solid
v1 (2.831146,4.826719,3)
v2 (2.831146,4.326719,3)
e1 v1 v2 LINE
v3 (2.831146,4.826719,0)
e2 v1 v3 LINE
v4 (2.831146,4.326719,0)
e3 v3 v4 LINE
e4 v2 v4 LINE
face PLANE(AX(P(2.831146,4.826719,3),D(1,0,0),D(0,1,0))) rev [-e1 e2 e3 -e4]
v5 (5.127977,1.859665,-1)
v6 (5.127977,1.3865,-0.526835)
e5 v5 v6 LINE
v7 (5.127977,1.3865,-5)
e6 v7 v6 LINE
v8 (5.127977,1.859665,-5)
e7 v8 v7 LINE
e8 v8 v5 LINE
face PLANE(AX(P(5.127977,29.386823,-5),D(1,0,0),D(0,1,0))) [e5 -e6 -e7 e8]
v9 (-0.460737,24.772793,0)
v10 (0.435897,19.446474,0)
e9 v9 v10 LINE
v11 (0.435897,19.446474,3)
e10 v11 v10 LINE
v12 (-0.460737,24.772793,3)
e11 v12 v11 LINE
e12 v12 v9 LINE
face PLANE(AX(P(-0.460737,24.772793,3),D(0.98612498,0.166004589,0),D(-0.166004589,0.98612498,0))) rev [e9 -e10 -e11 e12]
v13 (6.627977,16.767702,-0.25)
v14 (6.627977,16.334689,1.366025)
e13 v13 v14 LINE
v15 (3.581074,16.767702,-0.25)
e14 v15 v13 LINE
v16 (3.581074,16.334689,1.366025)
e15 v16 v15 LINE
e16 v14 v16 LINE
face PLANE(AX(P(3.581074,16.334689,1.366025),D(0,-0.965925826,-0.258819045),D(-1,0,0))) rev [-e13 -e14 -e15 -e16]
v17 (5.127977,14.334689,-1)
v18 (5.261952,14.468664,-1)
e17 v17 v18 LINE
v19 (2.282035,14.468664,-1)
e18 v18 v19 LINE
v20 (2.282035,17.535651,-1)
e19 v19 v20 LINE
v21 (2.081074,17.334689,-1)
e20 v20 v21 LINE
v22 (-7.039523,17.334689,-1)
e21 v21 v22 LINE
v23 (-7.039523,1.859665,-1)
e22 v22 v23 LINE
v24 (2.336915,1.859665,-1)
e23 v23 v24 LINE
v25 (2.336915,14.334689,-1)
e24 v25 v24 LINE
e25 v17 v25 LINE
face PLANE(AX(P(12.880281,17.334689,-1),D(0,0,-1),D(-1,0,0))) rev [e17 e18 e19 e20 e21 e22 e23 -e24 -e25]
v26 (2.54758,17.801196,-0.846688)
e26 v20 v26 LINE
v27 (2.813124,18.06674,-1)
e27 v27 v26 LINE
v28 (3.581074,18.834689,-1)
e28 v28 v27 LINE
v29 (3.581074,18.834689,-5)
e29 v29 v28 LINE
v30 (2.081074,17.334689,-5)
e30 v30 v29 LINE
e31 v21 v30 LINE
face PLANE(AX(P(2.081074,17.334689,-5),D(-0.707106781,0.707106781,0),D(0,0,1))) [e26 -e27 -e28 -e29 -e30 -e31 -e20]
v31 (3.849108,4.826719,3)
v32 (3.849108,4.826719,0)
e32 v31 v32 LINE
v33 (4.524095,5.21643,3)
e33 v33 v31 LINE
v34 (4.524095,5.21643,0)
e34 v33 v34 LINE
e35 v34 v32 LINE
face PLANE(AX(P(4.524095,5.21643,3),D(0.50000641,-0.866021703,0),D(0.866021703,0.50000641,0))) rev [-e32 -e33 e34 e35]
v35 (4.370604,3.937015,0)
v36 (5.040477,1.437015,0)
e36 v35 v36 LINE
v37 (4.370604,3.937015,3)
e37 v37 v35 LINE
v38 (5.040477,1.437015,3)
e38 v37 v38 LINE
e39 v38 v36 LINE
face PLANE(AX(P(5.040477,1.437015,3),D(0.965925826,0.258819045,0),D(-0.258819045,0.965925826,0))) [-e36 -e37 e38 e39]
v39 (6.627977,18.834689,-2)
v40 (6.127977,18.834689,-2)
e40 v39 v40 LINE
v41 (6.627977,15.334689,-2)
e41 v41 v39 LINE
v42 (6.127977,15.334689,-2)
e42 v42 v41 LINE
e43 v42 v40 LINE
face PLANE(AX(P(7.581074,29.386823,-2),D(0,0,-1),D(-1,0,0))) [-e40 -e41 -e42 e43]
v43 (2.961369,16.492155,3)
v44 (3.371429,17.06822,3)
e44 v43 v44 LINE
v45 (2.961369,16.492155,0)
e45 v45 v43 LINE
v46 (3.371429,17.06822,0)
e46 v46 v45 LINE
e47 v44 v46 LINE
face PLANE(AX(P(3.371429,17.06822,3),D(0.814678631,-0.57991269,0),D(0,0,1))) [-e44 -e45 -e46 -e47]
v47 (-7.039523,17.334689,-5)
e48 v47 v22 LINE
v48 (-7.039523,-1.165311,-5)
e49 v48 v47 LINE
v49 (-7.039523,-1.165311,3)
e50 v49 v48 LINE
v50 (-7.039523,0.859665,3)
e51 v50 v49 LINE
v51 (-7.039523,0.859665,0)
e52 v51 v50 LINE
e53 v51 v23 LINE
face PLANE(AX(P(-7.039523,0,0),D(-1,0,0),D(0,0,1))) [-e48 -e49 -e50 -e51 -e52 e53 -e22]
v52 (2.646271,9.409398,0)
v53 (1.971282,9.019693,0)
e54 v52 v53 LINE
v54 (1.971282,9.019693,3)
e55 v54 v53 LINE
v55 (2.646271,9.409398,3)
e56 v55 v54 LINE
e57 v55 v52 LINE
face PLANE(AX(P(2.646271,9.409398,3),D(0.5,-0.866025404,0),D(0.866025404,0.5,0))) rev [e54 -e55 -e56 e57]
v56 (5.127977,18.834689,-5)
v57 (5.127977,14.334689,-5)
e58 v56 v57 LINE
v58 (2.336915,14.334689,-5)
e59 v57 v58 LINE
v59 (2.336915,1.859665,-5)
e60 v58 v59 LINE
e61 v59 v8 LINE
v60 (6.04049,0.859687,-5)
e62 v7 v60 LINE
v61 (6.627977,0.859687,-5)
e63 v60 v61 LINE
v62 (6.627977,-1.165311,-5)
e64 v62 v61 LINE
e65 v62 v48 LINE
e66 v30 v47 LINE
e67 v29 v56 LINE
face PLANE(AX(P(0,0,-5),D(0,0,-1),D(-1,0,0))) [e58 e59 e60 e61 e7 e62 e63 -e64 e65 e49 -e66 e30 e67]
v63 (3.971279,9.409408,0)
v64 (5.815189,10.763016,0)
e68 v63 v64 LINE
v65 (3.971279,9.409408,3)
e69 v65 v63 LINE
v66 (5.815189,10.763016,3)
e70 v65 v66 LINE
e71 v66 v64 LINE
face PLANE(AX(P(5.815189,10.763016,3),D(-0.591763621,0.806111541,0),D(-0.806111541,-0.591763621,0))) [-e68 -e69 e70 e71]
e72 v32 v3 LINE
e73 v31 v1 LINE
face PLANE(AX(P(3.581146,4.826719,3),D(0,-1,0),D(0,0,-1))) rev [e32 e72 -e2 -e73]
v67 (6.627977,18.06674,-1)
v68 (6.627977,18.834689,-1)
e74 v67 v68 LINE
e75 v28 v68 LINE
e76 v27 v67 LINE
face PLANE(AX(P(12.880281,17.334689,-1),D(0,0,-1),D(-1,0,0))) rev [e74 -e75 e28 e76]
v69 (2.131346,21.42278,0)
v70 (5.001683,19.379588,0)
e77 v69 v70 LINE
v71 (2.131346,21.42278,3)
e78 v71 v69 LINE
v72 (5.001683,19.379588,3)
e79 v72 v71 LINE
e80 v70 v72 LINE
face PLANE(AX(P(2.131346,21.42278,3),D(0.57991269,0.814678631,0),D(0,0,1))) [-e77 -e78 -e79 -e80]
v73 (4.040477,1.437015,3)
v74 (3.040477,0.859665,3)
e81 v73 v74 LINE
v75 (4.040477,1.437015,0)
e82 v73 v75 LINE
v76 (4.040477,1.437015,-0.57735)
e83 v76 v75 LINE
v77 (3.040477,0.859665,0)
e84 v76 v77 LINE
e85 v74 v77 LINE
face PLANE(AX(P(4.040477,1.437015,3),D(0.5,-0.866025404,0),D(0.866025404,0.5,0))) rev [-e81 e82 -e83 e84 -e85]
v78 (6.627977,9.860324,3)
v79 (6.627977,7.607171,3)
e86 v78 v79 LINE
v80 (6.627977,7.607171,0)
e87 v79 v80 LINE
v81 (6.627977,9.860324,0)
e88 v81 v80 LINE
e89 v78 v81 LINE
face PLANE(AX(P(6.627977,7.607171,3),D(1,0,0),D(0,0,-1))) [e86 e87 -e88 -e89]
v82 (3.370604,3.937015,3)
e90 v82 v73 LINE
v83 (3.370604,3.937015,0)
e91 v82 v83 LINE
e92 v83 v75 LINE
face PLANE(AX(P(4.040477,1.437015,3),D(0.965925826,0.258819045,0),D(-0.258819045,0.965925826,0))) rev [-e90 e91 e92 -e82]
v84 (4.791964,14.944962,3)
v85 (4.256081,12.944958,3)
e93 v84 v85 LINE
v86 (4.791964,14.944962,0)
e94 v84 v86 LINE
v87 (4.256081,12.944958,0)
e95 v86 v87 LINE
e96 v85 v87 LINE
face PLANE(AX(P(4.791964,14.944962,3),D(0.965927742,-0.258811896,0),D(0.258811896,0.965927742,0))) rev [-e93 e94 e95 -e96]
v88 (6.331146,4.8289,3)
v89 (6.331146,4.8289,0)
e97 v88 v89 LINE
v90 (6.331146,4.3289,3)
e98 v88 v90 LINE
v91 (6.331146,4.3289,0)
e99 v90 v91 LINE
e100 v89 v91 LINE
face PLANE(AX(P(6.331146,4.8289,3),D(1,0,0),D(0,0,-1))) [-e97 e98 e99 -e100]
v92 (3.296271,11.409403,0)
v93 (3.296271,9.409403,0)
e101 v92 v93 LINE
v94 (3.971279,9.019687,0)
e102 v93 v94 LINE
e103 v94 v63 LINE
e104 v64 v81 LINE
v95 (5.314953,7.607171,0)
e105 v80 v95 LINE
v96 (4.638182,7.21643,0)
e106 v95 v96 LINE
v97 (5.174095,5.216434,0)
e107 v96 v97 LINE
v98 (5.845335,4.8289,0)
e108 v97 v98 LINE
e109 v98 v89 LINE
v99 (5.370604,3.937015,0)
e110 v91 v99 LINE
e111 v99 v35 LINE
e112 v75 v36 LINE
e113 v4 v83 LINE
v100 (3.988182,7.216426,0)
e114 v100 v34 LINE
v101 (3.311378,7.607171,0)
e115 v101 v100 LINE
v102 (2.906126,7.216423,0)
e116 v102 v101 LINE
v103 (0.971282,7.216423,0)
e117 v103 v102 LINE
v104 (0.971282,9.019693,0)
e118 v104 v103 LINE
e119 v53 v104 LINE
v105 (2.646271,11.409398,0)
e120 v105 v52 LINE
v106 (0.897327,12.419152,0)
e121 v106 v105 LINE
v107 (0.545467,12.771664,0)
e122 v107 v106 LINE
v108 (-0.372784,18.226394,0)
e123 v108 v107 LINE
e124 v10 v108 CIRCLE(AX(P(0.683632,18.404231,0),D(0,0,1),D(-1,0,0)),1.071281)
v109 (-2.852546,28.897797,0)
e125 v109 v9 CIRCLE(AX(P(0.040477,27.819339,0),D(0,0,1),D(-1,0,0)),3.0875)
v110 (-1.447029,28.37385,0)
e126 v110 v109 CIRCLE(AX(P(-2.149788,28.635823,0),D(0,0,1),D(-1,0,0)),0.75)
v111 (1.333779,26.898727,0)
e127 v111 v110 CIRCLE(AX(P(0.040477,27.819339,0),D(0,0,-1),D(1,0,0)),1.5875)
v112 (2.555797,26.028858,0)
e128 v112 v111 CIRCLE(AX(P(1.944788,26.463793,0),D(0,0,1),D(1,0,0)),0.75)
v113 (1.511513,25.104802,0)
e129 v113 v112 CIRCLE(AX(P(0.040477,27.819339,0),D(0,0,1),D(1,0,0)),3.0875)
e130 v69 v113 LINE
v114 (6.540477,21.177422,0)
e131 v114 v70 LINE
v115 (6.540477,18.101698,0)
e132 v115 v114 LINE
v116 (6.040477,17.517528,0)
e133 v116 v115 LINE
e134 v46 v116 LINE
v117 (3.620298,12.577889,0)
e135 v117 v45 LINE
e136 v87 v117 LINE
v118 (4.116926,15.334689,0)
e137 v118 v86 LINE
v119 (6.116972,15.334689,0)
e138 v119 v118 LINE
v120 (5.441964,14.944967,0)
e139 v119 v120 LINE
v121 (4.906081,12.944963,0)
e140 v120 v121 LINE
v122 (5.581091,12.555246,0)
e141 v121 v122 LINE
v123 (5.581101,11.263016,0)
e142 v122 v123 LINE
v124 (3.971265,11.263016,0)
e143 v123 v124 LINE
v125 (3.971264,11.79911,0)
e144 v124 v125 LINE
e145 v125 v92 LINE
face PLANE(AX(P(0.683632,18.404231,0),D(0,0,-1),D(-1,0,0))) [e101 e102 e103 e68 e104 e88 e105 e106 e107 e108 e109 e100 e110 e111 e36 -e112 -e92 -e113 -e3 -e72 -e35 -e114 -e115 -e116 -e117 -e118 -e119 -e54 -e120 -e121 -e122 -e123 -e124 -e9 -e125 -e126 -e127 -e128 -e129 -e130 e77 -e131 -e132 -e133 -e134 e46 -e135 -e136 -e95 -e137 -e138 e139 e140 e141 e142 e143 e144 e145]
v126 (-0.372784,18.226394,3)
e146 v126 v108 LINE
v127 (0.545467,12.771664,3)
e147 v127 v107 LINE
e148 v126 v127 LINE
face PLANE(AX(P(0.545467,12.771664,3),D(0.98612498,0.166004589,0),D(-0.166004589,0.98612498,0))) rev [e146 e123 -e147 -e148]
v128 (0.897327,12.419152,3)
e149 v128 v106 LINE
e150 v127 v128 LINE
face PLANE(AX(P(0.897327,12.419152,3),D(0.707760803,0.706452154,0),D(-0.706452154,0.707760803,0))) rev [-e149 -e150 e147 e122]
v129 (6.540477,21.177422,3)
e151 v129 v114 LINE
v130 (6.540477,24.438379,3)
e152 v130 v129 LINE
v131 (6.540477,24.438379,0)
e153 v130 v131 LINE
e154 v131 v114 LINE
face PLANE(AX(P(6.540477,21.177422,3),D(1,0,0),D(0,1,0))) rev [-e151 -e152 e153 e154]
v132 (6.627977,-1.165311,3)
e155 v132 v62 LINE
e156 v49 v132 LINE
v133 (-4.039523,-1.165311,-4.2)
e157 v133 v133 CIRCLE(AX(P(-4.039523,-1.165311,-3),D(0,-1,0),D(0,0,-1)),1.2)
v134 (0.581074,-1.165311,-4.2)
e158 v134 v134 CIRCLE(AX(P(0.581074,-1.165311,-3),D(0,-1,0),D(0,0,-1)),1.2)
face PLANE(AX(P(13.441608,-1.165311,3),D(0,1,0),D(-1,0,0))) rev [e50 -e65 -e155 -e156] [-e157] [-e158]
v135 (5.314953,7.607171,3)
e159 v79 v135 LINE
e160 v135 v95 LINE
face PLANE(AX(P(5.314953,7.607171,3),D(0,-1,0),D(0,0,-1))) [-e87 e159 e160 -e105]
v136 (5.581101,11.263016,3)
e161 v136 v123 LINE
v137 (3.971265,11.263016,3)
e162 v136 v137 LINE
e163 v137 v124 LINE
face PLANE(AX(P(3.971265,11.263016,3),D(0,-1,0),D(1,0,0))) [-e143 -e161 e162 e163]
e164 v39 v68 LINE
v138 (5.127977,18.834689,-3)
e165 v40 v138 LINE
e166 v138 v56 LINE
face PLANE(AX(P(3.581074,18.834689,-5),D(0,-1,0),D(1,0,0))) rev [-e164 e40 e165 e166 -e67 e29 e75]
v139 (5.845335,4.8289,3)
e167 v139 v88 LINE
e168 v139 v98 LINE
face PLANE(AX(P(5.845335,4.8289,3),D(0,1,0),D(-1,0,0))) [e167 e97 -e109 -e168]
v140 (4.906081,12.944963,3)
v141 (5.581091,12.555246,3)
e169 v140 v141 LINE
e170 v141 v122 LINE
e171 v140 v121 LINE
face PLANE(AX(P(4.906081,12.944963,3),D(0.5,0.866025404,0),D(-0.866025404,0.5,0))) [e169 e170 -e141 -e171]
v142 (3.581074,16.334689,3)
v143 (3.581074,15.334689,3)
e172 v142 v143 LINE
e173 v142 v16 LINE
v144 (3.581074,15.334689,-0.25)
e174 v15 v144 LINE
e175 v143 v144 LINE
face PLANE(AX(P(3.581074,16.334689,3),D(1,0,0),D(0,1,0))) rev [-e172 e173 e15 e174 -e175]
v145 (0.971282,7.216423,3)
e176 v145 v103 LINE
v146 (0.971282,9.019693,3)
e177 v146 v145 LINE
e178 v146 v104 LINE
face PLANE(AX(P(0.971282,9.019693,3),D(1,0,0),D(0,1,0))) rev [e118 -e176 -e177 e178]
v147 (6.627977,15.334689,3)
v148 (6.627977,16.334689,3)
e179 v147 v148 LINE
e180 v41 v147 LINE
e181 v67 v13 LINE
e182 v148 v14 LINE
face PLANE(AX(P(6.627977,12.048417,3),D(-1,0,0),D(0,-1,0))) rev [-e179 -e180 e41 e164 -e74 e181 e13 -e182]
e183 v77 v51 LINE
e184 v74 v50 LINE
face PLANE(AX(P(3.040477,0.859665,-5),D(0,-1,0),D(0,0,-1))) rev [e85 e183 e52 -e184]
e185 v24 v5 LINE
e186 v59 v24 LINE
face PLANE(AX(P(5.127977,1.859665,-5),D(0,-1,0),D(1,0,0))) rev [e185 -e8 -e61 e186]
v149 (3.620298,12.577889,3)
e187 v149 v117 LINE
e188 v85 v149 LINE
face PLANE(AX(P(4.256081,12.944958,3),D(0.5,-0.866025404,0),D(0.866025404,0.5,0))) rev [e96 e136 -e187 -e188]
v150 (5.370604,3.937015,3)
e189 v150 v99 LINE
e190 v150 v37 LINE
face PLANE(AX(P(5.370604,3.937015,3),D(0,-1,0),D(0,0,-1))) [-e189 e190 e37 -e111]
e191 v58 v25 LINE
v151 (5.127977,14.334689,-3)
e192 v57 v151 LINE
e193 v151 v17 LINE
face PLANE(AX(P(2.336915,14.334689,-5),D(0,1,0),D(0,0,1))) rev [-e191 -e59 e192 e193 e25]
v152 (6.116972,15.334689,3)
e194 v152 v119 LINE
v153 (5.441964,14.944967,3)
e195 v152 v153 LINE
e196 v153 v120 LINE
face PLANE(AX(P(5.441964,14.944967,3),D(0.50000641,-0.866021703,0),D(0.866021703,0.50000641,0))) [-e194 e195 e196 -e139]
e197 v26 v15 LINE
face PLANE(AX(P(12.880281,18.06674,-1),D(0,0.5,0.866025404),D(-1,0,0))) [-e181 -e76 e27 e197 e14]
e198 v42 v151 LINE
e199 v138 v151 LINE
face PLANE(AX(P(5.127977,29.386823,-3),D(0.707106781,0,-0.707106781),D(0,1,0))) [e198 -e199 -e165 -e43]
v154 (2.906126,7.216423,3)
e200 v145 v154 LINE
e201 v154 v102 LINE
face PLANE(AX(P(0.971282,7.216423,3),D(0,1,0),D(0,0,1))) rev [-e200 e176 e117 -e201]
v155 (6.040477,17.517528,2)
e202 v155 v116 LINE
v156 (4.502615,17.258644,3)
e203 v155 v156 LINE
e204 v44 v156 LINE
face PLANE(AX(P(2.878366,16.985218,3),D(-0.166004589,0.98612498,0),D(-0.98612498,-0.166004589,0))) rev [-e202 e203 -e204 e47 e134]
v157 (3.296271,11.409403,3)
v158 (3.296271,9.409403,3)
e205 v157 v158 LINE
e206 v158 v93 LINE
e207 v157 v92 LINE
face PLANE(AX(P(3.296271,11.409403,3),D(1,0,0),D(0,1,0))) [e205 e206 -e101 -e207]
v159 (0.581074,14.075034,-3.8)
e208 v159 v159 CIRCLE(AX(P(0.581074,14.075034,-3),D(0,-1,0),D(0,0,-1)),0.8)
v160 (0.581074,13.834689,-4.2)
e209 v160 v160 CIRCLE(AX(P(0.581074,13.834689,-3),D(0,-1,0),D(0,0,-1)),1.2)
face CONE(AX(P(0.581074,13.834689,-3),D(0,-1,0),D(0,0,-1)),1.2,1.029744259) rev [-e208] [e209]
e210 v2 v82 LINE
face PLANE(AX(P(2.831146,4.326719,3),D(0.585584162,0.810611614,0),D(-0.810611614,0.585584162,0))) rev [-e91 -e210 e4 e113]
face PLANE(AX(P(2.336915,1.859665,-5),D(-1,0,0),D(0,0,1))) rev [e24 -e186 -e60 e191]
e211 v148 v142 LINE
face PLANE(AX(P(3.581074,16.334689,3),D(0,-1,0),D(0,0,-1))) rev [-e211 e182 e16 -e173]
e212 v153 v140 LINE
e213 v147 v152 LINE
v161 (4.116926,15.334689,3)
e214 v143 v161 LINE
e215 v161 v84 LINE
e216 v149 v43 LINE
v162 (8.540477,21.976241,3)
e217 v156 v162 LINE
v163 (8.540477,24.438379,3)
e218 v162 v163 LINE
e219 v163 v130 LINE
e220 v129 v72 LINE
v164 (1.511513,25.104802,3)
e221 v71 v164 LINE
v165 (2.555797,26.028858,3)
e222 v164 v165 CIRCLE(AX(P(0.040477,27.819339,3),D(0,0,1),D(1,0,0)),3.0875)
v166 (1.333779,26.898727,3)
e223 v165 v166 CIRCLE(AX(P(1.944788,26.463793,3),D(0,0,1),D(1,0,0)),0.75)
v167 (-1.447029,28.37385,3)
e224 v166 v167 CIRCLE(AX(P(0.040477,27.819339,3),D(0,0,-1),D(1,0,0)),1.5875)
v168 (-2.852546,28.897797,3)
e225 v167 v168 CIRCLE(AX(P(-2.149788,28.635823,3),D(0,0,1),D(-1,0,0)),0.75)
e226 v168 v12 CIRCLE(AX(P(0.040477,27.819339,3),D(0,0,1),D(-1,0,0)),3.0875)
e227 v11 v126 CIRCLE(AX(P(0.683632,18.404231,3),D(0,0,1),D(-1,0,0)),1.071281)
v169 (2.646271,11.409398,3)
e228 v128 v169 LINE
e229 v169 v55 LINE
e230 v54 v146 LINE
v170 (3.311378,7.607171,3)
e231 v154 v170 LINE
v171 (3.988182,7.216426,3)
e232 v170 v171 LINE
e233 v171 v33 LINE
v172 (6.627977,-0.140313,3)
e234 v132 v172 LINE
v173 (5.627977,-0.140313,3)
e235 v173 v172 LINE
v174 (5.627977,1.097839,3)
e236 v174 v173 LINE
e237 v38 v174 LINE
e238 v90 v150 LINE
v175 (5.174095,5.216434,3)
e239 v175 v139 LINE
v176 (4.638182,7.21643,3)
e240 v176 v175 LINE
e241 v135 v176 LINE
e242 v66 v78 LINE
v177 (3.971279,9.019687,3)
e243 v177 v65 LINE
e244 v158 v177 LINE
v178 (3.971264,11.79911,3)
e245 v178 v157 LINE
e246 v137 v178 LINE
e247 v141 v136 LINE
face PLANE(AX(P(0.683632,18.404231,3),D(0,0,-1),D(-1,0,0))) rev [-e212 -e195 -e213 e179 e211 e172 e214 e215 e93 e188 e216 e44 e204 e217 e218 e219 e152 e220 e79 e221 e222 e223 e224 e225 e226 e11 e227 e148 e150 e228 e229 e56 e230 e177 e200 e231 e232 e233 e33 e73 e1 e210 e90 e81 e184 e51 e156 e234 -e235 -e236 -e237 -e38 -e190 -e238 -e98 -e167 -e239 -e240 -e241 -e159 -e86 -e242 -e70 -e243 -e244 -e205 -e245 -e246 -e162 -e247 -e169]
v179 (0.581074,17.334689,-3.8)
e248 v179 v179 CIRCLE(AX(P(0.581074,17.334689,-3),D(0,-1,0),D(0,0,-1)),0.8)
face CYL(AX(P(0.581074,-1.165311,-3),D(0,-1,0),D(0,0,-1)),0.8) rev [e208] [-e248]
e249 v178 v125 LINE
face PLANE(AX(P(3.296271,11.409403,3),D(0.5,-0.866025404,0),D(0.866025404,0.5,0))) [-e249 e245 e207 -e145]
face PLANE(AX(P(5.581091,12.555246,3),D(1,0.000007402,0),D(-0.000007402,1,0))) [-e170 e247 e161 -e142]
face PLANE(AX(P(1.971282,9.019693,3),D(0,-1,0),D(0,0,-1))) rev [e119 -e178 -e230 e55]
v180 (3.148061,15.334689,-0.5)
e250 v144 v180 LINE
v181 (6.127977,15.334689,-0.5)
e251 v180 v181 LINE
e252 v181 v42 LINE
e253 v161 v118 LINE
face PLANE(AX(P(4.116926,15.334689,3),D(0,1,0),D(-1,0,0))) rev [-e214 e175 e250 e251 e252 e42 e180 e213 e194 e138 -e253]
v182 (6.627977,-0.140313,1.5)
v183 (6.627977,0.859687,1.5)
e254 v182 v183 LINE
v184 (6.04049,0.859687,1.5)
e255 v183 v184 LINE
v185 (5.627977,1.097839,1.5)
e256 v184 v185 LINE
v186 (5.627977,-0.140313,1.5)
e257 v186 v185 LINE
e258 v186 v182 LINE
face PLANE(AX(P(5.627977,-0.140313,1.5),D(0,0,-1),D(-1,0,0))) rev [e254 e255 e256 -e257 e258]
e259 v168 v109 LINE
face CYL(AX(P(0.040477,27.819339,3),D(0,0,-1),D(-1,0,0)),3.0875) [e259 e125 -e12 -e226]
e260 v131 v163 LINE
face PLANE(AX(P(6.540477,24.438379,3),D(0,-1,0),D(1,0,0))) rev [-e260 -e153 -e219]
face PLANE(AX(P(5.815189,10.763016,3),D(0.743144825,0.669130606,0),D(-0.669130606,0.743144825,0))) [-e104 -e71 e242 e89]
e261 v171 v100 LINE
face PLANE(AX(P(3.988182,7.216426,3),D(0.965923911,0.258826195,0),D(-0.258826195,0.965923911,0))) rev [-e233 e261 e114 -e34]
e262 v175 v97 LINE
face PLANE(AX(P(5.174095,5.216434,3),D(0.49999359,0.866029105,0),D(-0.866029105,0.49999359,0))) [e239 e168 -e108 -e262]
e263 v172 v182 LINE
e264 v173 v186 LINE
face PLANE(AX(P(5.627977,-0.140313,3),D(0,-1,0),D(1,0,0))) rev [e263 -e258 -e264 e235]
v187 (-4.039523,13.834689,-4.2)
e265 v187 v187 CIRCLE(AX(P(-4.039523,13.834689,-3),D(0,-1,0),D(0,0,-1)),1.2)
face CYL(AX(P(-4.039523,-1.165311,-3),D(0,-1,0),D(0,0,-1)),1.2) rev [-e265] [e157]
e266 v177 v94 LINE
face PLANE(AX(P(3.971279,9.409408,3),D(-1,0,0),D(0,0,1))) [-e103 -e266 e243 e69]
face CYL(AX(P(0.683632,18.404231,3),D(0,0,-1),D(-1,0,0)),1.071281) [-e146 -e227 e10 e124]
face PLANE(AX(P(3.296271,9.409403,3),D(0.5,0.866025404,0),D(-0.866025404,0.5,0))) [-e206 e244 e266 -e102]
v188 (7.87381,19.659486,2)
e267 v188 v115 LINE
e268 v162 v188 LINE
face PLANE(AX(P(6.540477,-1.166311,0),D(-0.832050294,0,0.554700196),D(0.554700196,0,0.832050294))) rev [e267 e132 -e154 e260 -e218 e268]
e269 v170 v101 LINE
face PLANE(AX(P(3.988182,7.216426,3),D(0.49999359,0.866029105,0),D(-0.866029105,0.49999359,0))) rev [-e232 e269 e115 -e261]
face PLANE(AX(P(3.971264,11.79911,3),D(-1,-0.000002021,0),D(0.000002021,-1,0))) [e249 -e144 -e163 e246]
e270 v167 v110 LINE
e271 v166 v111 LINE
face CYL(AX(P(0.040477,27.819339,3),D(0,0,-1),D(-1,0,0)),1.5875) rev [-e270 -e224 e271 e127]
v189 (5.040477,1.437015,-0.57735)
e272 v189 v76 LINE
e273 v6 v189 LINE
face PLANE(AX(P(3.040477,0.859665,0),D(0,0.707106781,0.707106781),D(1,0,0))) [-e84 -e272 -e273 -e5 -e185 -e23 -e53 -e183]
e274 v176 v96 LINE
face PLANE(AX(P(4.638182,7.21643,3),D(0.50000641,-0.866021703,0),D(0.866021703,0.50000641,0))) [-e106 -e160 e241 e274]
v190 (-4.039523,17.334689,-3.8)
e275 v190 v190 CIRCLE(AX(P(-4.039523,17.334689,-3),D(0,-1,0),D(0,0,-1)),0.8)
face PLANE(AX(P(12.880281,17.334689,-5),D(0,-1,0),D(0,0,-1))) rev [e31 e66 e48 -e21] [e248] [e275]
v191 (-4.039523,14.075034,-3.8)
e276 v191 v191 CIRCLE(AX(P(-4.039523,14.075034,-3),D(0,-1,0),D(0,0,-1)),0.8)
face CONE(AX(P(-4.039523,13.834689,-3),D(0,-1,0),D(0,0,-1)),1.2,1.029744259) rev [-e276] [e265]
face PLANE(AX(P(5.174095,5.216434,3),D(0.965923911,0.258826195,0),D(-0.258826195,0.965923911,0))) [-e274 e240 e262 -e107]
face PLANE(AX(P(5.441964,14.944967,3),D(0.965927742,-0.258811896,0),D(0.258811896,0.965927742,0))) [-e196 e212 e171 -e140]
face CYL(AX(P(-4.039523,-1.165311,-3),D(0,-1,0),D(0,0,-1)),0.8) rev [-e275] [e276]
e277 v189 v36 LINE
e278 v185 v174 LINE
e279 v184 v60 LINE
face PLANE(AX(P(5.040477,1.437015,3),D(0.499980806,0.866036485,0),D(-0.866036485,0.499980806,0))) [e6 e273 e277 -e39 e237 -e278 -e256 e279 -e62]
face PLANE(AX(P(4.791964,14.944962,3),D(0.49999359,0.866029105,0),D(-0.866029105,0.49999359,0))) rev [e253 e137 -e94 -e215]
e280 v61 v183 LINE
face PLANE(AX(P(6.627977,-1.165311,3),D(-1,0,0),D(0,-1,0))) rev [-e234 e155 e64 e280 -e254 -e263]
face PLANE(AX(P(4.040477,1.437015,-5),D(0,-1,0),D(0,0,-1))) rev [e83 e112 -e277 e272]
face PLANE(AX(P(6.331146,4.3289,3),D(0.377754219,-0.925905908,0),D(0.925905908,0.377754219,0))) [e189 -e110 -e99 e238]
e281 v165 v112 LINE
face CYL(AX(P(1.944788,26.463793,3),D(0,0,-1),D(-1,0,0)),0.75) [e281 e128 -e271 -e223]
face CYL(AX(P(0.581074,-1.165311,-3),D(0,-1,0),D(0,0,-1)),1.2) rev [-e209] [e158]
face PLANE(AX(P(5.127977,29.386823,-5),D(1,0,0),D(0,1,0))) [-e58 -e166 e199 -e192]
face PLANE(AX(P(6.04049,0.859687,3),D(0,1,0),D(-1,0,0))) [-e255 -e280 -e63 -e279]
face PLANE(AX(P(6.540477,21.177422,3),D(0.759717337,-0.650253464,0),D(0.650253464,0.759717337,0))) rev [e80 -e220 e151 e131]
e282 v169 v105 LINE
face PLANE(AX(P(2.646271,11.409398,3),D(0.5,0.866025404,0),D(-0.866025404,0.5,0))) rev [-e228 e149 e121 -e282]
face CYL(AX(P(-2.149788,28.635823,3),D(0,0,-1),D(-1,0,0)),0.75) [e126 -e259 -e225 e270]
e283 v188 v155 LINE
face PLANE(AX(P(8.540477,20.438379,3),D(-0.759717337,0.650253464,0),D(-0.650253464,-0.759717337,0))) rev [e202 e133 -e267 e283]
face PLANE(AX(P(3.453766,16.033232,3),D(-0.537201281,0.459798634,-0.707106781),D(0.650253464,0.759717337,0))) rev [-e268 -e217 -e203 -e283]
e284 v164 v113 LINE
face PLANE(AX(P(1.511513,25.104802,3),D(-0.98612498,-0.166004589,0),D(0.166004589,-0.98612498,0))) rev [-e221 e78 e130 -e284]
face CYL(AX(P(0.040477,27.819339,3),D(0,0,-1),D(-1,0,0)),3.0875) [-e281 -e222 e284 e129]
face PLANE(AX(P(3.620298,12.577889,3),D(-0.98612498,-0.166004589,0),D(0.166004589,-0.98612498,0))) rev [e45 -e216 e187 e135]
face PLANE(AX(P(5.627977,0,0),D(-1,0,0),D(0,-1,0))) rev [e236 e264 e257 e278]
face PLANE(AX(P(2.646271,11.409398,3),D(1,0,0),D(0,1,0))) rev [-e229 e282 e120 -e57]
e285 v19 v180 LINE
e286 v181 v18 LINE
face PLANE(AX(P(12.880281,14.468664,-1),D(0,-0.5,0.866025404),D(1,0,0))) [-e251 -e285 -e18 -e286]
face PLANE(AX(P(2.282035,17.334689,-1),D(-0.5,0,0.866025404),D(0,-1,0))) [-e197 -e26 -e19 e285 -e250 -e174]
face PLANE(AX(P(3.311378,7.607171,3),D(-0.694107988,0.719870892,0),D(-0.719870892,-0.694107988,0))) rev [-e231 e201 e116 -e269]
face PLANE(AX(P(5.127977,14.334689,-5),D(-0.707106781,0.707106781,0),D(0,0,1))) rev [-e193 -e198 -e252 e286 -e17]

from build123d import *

# Parameters (mm, degrees)
BOSS_SWITCH_BODY_DEPTH                         = 3
SKETCH1_W                                      = 4
SKETCH1_H                                      = 3.5
BOSS_FLANGE_WIDTH_DEPTH                        = 5
BOSS_FLANGE_HEIGHT_REACH                       = 38.166
SKETCH2_W                                      = 4
SKETCH2_H                                      = 2
SKETCH2_W_2                                    = 8
SKETCH2_H_2                                    = 2.024975669
CUT_UP_TO_DOWN_DERAILLEUR_CLEARANCE_REACH      = 23.862
SKETCH10_W                                     = 2.453096586
SKETCH10_H                                     = 3
SKETCH17_W                                     = 12.1675
SKETCH17_H                                     = 4
BOSS_FLANGE_SUPPORT_DEPTH                      = 14.475024331
TAP_DRILL_FOR_M2X0_4_TAP1_D                    = 1.6
M2_CLEARANCE_HOLE2_D                           = 2.4
M2_CLEARANCE_HOLE2_DEPTH                       = 15
M2_CLEARANCE_HOLE2_TIP                         = 0.721032743
CUT_UP_TO_DOWN_CANTILEVER_SLOPE_REACH          = 31.347
CUT_DOWN_TO_UP_DERAILLEUR_CLEARANCE_DEPTH      = 33.69867621
CUT_DOWN_TO_UP_DERAILLEUR_CLEARANCE_DEPTH_BACK = 33.69867621
CHAMFER_FLANGE_SUPPORT_SIZE                    = 1.5
CHAMFER_FLANGE_SUPPORT_2_SIZE                  = 1
CHAMFER_FLANGE_SUPPORT_3_SIZE                  = 1
SKETCH18_W                                     = 1.5
SKETCH18_H                                     = 1.577328106
CUT_DOWN_TO_UP_DERAILLEUR_CLEARANCE_2_DEPTH    = 1
SKETCH19_W                                     = 3.046903414
SKETCH19_H                                     = 2.563581512
CUT_UP_TO_DOWN_CANTILEVER_CLEARANCE_DEPTH      = 1
CHAMFER1_SIZE                                  = 1
CHAMFER1_SIZE_2                                = 1.732050808
CHAMFER3_SIZE                                  = 0.75
CHAMFER3_SIZE_2                                = 1.299038106
CHAMFER4_SIZE                                  = 0.5
CHAMFER4_SIZE2                                 = 0.866025404
CHAMFER5_SIZE                                  = 0.5
CHAMFER6_SIZE                                  = 2.5
CHAMFER7_SIZE                                  = 1
CUT_EXTRUDE3_REACH                             = 33.008
CHAMFER8_SIZE                                  = 0.5
CHAMFER8_SIZE2                                 = 1.366025404
SKETCH23_W                                     = 2.791062273
SKETCH23_H                                     = 12.475024331
CUT_EXTRUDE4_DEPTH                             = 31.862053717


# Some blends are built 0.0001 mm under size
with BuildPart() as part:
    # Sketch-SwitchBossUp → Boss-Switch Body (new body)
    with BuildSketch(Plane.XY):
        with BuildLine():
            Line((6.540476927, 21.177422148), (6.540476927, 24.438379064))
            Line((6.540476927, 24.438379064), (8.540476927, 24.438379064))
            Line((8.540476927, 24.438379064), (8.540476927, 20.438379064))
            Line((8.540476927, 20.438379064), (6.040476927, 17.517528279))
            Line((6.040476927, 17.517528279), (2.878366495, 16.985217616))
            Line((2.878366495, 16.985217616), (3.620297651, 12.577888564))
            Line((3.620297651, 12.577888564), (4.256080915, 12.944958203))
            Line((4.256080915, 12.944958203), (4.791964496, 14.944962169))
            Line((4.791964496, 14.944962169), (4.116925685, 15.334689347))
            Line((4.116925685, 15.334689347), (3.581073513, 15.334689347))
            Line((3.581073513, 15.334689347), (3.581073513, 16.334689347))
            Line((3.581073513, 16.334689347), (6.857327822, 16.334689347))
            Line((6.857327822, 16.334689347), (13.441607507, 16.334689347))
            Line((13.441607507, 16.334689347), (13.441607507, -1.165310653))
            Line((13.441607507, -1.165310653), (5.040476927, -1.165310653))
            Line((5.040476927, -1.165310653), (3.040476927, -1.165310653))
            Line((3.040476927, -1.165310653), (3.040476927, 0.859665016))
            Line((3.040476927, 0.859665016), (4.040476927, 1.437015286))
            Line((4.040476927, 1.437015286), (3.370603946, 3.937015286))
            Line((3.370603946, 3.937015286), (2.83114552, 4.326718942))
            Line((2.83114552, 4.326718942), (2.83114552, 4.826718942))
            Line((2.83114552, 4.826718942), (3.58114552, 4.826718942))
            Line((3.58114552, 4.826718942), (3.849107629, 4.826718942))
            Line((3.849107629, 4.826718942), (4.524094713, 5.216429578))
            Line((4.524094713, 5.216429578), (3.988181525, 7.216425611))
            Line((3.988181525, 7.216425611), (3.311378308, 7.607171452))
            Line((3.311378308, 7.607171452), (2.9061262, 7.216422599))
            Line((2.9061262, 7.216422599), (0.971281627, 7.216422599))
            Line((0.971281627, 7.216422599), (0.971281627, 9.019692757))
            Line((0.971281627, 9.019692757), (1.971281627, 9.019692757))
            Line((1.971281627, 9.019692757), (2.646271341, 9.40939825))
            Line((2.646271341, 9.40939825), (2.646271341, 11.40939825))
            Line((2.646271341, 11.40939825), (0.897326855, 12.41915182))
            Line((0.897326855, 12.41915182), (0.545466745, 12.771663724))
            Line((0.545466745, 12.771663724), (-0.372784255, 18.226393961))
            ThreePointArc((-0.372784255, 18.226393961), (-0.209313172, 18.996084896), (0.435897335, 19.446473985))
            Line((0.435897335, 19.446473985), (-0.46073685, 24.772792819))
            ThreePointArc((-0.46073685, 24.772792819), (-2.630501593, 26.270619745), (-2.852546321, 28.897797067))
            ThreePointArc((-2.852546321, 28.897797067), (-1.887813913, 29.338582026), (-1.447028953, 28.373849618))
            ThreePointArc((-1.447028953, 28.373849618), (-0.703448682, 26.416936722), (1.333779254, 26.898727173))
            ThreePointArc((1.333779254, 26.898727173), (2.379722745, 27.074801628), (2.555797201, 26.028858137))
            ThreePointArc((2.555797201, 26.028858137), (2.086504637, 25.507104397), (1.511513111, 25.104801997))
            Line((1.511513111, 25.104801997), (2.546357317, 18.957467576))
            Line((2.546357317, 18.957467576), (4.992893704, 19.36931828))
            Line((4.992893704, 19.36931828), (6.540476927, 21.177422148))
        make_face()
        Polygon((5.581091201, 12.555245643), (5.581100766, 11.263016278), (3.971265023, 11.263016278), (3.97126394, 11.79911022), (3.296271341, 11.409403061), (3.296271341, 9.409403061), (3.971278743, 9.019687356), (3.971278743, 9.409408058), (5.815189335, 10.763016278), (6.627976927, 9.860324206), (6.627976927, 8.365258971), (6.627976927, 7.607171452), (5.314953271, 7.607171452), (4.638181525, 7.216430422), (5.174094713, 5.216434389), (5.845334952, 4.828900281), (6.33114552, 4.828900281), (6.33114552, 4.328900281), (5.370603946, 3.937015286), (4.370603946, 3.937015286), (5.040476927, 1.437015286), (6.040489723, 0.85968718), (9.127976927, 0.85968718), (10.437466736, 2.169176988), (10.437466736, 14.025199539), (9.127976927, 15.334689347), (6.116971898, 15.334689347), (5.441964496, 14.94496698), (4.906080915, 12.944963014), align=None, mode=Mode.SUBTRACT)
    extrude(amount=BOSS_SWITCH_BODY_DEPTH)

    # Sketch1 → Boss-Flange Width (add)
    with BuildSketch(Plane(origin=(0, 0, 0), x_dir=(-1, 0, 0), z_dir=(0, 0, -1))):
        Polygon((-7.581073513, -1.165310653), (0.412170615, -1.165310653), (0.412170615, 0.859665016), (-3.040476927, 0.859665016), (-4.040476927, 1.437015286), (-5.040476927, 1.437015286), (-6.040489723, 0.85968718), (-7.581073513, 0.85968718), align=None)
        with Locations((-5.581073513, 17.084689347)):
            Rectangle(SKETCH1_W, SKETCH1_H)
    extrude(amount=BOSS_FLANGE_WIDTH_DEPTH)

    # Sketch2 → Boss-Flange Height (add, up to next)
    with BuildSketch(Plane(origin=(-7.039523073, 0, 0), x_dir=(0, 0, -1), z_dir=(1, 0, 0)), mode=Mode.PRIVATE) as boss_flange_height_sk1:
        with Locations((3, 16.334689347)):
            Rectangle(SKETCH2_W, SKETCH2_H)
    boss_flange_height_tool1 = extrude(boss_flange_height_sk1.sketch, amount=BOSS_FLANGE_HEIGHT_REACH, mode=Mode.PRIVATE) - part.part
    # Sketch2 → Boss-Flange Height (add, up to next)
    with BuildSketch(Plane(origin=(-7.039523073, 0, 0), x_dir=(0, 0, -1), z_dir=(1, 0, 0)), mode=Mode.PRIVATE) as boss_flange_height_sk2:
        with Locations((1, -0.152822819)):
            Rectangle(SKETCH2_W_2, SKETCH2_H_2)
    boss_flange_height_tool2 = extrude(boss_flange_height_sk2.sketch, amount=BOSS_FLANGE_HEIGHT_REACH, mode=Mode.PRIVATE) - part.part
    add(boss_flange_height_tool1.solids().sort_by_distance((-7.039523, 16.334689, -3))[0])
    add(boss_flange_height_tool2.solids().sort_by_distance((-7.039523, -0.152823, -1))[0])

    # Sketch10 → Cut-Up-To-Down Derailleur Clearance (cut, up to next)
    with BuildSketch(Plane(origin=(0, 15.334689347, 0), x_dir=(1, 0, 0), z_dir=(0, 1, 0)), mode=Mode.PRIVATE) as cut_up_to_down_derailleur_clearance_sk1:
        with Locations((6.35452522, 3.5)):
            Rectangle(SKETCH10_W, SKETCH10_H)
    cut_up_to_down_derailleur_clearance_tool1 = extrude(cut_up_to_down_derailleur_clearance_sk1.sketch, amount=CUT_UP_TO_DOWN_DERAILLEUR_CLEARANCE_REACH, mode=Mode.PRIVATE) & part.part
    add(cut_up_to_down_derailleur_clearance_tool1.solids().sort_by_distance((6.354525, 15.334689, -3.5))[0], mode=Mode.SUBTRACT)

    # Sketch17 → Boss-Flange Support (add)
    with BuildSketch(Plane.XZ.offset(-15.334689347)):
        with Locations((-0.955773073, -3)):
            Rectangle(SKETCH17_W, SKETCH17_H)
    extrude(amount=BOSS_FLANGE_SUPPORT_DEPTH)

    # Tap Drill for M2x0.4 Tap1 (through all)
    with Locations(Plane(origin=(0, -1.165310653, 0), x_dir=(-1, 0, 0), z_dir=(0, -1, 0))):
        with Locations((4.039523073, 3), (-0.581073513, 3)):
            Hole(TAP_DRILL_FOR_M2X0_4_TAP1_D / 2)

    # M2 Clearance Hole2
    with Locations(Plane.XZ.offset(1.165310653)):
        with Locations((-4.039523073, -3), (0.581073513, -3)):
            Hole(M2_CLEARANCE_HOLE2_D / 2, depth=M2_CLEARANCE_HOLE2_DEPTH)
            with Locations((0, 0, -(M2_CLEARANCE_HOLE2_DEPTH + M2_CLEARANCE_HOLE2_TIP / 2))):  # 118° drill point
                Cone(0, M2_CLEARANCE_HOLE2_D / 2, M2_CLEARANCE_HOLE2_TIP, mode=Mode.SUBTRACT)

    # Sketch12 → Cut-Up-to-Down Cantilever Slope (cut, up to next)
    with BuildSketch(Plane(origin=(0, 24.438379064, 0), x_dir=(1, 0, 0), z_dir=(0, 1, 0)), mode=Mode.PRIVATE) as cut_up_to_down_cantilever_slope_sk1:
        Polygon((6.540476927, 0), (8.540476927, -3), (8.540476927, 0), align=None)
    cut_up_to_down_cantilever_slope_tool1 = extrude(cut_up_to_down_cantilever_slope_sk1.sketch, amount=-CUT_UP_TO_DOWN_CANTILEVER_SLOPE_REACH, mode=Mode.PRIVATE) & part.part
    add(cut_up_to_down_cantilever_slope_tool1.solids().sort_by_distance((7.87381, 24.438379, 1))[0], mode=Mode.SUBTRACT)

    # Sketch16 → Cut-Down-to-Up Derailleur Clearance (cut, two sides: drawn at the far end of the back side and taken through both)
    with BuildSketch(Plane(origin=(0, 0, 0), x_dir=(-1, 0, 0), z_dir=(0, 0, -1)).offset(-CUT_DOWN_TO_UP_DERAILLEUR_CLEARANCE_DEPTH_BACK)):
        Polygon((-7.581073513, 18.834689347), (-13.441607507, 18.834689347), (-13.441607507, -1.165310653), (-6.627976927, -1.165310653), (-6.627976927, 5.203794929), (-8.003689255, 5.203794929), (-8.003689255, 12.048417413), (-6.627976927, 12.048417413), (-6.627976927, 17.947659965), align=None)
    extrude(amount=CUT_DOWN_TO_UP_DERAILLEUR_CLEARANCE_DEPTH + CUT_DOWN_TO_UP_DERAILLEUR_CLEARANCE_DEPTH_BACK, mode=Mode.SUBTRACT)

    # Chamfer-Flange Support
    chamfer_flange_support_edges = [part.edges().sort_by_distance(p)[0] for p in [
        (3.581073513, 17.334689347, -3),
    ]]
    chamfer(chamfer_flange_support_edges, length=CHAMFER_FLANGE_SUPPORT_SIZE - 0.0001)  # a hair under: the kernel refuses the full size

    # Chamfer-Flange Support 2
    chamfer_flange_support_2_edges = [part.edges().sort_by_distance(p)[0] for p in [
        (5.127976927, 17.084689347, -2),
        (5.127976927, 15.334689347, -1.5),
    ]]
    chamfer(chamfer_flange_support_2_edges, length=CHAMFER_FLANGE_SUPPORT_2_SIZE)

    # Chamfer-Flange Support 3
    chamfer_flange_support_3_edges = [part.edges().sort_by_distance(p)[0] for p in [
        (-1.999523073, 0.859665016, -1),
    ]]
    chamfer(chamfer_flange_support_3_edges, length=CHAMFER_FLANGE_SUPPORT_3_SIZE)

    # Sketch18 → Cut-Down-to-Up Derailleur Clearance 2 (cut)
    with BuildSketch(Plane(origin=(6.627976927, 0, 0), x_dir=(0, 0, -1), z_dir=(1, 0, 0))):
        with Locations((-2.25, 0.648351233)):
            Rectangle(SKETCH18_W, SKETCH18_H)
    extrude(amount=-CUT_DOWN_TO_UP_DERAILLEUR_CLEARANCE_2_DEPTH, mode=Mode.SUBTRACT)

    # Sketch19 → Cut-Up-to-Down Cantilever Clearance (cut)
    with BuildSketch(Plane.XY):
        with Locations((5.10452522, 17.616480103)):
            Rectangle(SKETCH19_W, SKETCH19_H)
    extrude(amount=-CUT_UP_TO_DOWN_CANTILEVER_CLEARANCE_DEPTH, mode=Mode.SUBTRACT)

    # Chamfer1
    # the kernel refuses this chamfer: 1.732050808, 1 mm, written as the material it adds along each edge
    with BuildSketch(Plane(origin=(6.627976927, 16.334689347, -1), x_dir=(0, -0.05789386240266977, 0.9983227437537926), z_dir=(-1, 0, 0))) as chamfer1_piece_1:
        Polygon((CHAMFER1_SIZE * 0.998322743754, CHAMFER1_SIZE * 0.0578938624027), (-CHAMFER1_SIZE_2 * 0.0578938623883, CHAMFER1_SIZE_2 * 0.998322743505), (0, 0), align=None)
    extrude(amount=3.046903414)

    # Chamfer3
    # the kernel refuses this chamfer: 1.299038106, 0.75 mm, written as the material it adds along each edge
    with BuildSketch(Plane(origin=(3.581073513, 15.334689347, -1), x_dir=(0.05789386240236086, -1.5934376059306423e-13, 0.9983227437538106), z_dir=(0, 1, 0))) as chamfer3_piece_1_section:
        Polygon((CHAMFER3_SIZE * 0.998322743754, -CHAMFER3_SIZE * 0.0578938624027), (-CHAMFER3_SIZE_2 * 0.057893862388, -CHAMFER3_SIZE_2 * 0.998322743505), (0, 0), align=None)
    chamfer3_piece_1 = extrude(amount=6.092773786, mode=Mode.PRIVATE)
    chamfer3_piece_1 = split(chamfer3_piece_1, bisect_by=Plane(origin=(3.127107762, 16.799062109, -0.268105739), z_dir=(0, -0.4999999999999566, -0.8660254037844637)), keep=Keep.TOP, mode=Mode.PRIVATE)
    chamfer3_piece_1 = split(chamfer3_piece_1, bisect_by=Plane(origin=(2.18713947, 17.440655304, -0.784906566), z_dir=(0.7071067811865476, -0.7071067811865476, 0)), keep=Keep.TOP, mode=Mode.PRIVATE)
    add(chamfer3_piece_1)

    # Chamfer4
    chamfer4_edges = [part.edges().sort_by_distance(p)[0] for p in [
        (4.205006167, 15.334689347, -1),
    ]]
    chamfer4_side = [part.faces().sort_by_distance(p)[0] for p in [
        (2.964678171, 15.334689347, -0.682371949),
    ]]
    chamfer(chamfer4_edges, length=CHAMFER4_SIZE, length2=CHAMFER4_SIZE2, reference=chamfer4_side[0])

    # Chamfer5
    chamfer5_edges = [part.edges().sort_by_distance(p)[0] for p in [
        (2.878366495, 16.985217616, 1.5),
    ]]
    chamfer(chamfer5_edges, length=CHAMFER5_SIZE)

    # Chamfer6
    # the kernel refuses this chamfer: 2.5 mm, written as the material it adds along each edge
    with BuildSketch(Plane(origin=(2.546357317, 18.957467576, 0), x_dir=(0.9903165846799726, 0.13882745444541758, 0), z_dir=(0, 0, 1))) as chamfer6_piece_1:
        Polygon((CHAMFER6_SIZE * 0.999621916911, CHAMFER6_SIZE * 0.0274958766106), (-CHAMFER6_SIZE * 0.0274958766106, CHAMFER6_SIZE * 0.999621916911), (0, 0), align=None)
    extrude(amount=3)

    # Chamfer7
    chamfer7_edges = [part.edges().sort_by_distance(p)[0] for p in [
        (7.290476927, 18.977953671, 3),
    ]]
    chamfer(chamfer7_edges, length=CHAMFER7_SIZE)

    # Sketch22 → Cut-Extrude3 (cut, up to next)
    with BuildSketch(Plane.XY, mode=Mode.PRIVATE) as cut_extrude3_sk1:
        Polygon((6.627976927, 17.947659965), (7.581073513, 18.834689347), (6.627976927, 18.834689347), align=None)
    cut_extrude3_tool1 = extrude(cut_extrude3_sk1.sketch, amount=-CUT_EXTRUDE3_REACH, mode=Mode.PRIVATE) & part.part
    add(cut_extrude3_tool1.solids().sort_by_distance((6.945676, 18.539013, 0))[0], mode=Mode.SUBTRACT)

    # Chamfer8
    chamfer8_edges = [part.edges().sort_by_distance(p)[0] for p in [
        (5.10452522, 16.334689347, 0),
    ]]
    chamfer8_side = [part.faces().sort_by_distance(p)[0] for p in [
        (4.861507649, 17.252033573, -0.529628936),
    ]]
    chamfer(chamfer8_edges, length=CHAMFER8_SIZE, length2=CHAMFER8_SIZE2, reference=chamfer8_side[0])

    # Sketch23 → Cut-Extrude4 (cut, through all)
    with BuildSketch(Plane.XY.offset(-1)):
        with Locations((3.732445791, 8.097177182)):
            Rectangle(SKETCH23_W, SKETCH23_H)
    extrude(amount=-CUT_EXTRUDE4_DEPTH, mode=Mode.SUBTRACT)


solid = part.part
